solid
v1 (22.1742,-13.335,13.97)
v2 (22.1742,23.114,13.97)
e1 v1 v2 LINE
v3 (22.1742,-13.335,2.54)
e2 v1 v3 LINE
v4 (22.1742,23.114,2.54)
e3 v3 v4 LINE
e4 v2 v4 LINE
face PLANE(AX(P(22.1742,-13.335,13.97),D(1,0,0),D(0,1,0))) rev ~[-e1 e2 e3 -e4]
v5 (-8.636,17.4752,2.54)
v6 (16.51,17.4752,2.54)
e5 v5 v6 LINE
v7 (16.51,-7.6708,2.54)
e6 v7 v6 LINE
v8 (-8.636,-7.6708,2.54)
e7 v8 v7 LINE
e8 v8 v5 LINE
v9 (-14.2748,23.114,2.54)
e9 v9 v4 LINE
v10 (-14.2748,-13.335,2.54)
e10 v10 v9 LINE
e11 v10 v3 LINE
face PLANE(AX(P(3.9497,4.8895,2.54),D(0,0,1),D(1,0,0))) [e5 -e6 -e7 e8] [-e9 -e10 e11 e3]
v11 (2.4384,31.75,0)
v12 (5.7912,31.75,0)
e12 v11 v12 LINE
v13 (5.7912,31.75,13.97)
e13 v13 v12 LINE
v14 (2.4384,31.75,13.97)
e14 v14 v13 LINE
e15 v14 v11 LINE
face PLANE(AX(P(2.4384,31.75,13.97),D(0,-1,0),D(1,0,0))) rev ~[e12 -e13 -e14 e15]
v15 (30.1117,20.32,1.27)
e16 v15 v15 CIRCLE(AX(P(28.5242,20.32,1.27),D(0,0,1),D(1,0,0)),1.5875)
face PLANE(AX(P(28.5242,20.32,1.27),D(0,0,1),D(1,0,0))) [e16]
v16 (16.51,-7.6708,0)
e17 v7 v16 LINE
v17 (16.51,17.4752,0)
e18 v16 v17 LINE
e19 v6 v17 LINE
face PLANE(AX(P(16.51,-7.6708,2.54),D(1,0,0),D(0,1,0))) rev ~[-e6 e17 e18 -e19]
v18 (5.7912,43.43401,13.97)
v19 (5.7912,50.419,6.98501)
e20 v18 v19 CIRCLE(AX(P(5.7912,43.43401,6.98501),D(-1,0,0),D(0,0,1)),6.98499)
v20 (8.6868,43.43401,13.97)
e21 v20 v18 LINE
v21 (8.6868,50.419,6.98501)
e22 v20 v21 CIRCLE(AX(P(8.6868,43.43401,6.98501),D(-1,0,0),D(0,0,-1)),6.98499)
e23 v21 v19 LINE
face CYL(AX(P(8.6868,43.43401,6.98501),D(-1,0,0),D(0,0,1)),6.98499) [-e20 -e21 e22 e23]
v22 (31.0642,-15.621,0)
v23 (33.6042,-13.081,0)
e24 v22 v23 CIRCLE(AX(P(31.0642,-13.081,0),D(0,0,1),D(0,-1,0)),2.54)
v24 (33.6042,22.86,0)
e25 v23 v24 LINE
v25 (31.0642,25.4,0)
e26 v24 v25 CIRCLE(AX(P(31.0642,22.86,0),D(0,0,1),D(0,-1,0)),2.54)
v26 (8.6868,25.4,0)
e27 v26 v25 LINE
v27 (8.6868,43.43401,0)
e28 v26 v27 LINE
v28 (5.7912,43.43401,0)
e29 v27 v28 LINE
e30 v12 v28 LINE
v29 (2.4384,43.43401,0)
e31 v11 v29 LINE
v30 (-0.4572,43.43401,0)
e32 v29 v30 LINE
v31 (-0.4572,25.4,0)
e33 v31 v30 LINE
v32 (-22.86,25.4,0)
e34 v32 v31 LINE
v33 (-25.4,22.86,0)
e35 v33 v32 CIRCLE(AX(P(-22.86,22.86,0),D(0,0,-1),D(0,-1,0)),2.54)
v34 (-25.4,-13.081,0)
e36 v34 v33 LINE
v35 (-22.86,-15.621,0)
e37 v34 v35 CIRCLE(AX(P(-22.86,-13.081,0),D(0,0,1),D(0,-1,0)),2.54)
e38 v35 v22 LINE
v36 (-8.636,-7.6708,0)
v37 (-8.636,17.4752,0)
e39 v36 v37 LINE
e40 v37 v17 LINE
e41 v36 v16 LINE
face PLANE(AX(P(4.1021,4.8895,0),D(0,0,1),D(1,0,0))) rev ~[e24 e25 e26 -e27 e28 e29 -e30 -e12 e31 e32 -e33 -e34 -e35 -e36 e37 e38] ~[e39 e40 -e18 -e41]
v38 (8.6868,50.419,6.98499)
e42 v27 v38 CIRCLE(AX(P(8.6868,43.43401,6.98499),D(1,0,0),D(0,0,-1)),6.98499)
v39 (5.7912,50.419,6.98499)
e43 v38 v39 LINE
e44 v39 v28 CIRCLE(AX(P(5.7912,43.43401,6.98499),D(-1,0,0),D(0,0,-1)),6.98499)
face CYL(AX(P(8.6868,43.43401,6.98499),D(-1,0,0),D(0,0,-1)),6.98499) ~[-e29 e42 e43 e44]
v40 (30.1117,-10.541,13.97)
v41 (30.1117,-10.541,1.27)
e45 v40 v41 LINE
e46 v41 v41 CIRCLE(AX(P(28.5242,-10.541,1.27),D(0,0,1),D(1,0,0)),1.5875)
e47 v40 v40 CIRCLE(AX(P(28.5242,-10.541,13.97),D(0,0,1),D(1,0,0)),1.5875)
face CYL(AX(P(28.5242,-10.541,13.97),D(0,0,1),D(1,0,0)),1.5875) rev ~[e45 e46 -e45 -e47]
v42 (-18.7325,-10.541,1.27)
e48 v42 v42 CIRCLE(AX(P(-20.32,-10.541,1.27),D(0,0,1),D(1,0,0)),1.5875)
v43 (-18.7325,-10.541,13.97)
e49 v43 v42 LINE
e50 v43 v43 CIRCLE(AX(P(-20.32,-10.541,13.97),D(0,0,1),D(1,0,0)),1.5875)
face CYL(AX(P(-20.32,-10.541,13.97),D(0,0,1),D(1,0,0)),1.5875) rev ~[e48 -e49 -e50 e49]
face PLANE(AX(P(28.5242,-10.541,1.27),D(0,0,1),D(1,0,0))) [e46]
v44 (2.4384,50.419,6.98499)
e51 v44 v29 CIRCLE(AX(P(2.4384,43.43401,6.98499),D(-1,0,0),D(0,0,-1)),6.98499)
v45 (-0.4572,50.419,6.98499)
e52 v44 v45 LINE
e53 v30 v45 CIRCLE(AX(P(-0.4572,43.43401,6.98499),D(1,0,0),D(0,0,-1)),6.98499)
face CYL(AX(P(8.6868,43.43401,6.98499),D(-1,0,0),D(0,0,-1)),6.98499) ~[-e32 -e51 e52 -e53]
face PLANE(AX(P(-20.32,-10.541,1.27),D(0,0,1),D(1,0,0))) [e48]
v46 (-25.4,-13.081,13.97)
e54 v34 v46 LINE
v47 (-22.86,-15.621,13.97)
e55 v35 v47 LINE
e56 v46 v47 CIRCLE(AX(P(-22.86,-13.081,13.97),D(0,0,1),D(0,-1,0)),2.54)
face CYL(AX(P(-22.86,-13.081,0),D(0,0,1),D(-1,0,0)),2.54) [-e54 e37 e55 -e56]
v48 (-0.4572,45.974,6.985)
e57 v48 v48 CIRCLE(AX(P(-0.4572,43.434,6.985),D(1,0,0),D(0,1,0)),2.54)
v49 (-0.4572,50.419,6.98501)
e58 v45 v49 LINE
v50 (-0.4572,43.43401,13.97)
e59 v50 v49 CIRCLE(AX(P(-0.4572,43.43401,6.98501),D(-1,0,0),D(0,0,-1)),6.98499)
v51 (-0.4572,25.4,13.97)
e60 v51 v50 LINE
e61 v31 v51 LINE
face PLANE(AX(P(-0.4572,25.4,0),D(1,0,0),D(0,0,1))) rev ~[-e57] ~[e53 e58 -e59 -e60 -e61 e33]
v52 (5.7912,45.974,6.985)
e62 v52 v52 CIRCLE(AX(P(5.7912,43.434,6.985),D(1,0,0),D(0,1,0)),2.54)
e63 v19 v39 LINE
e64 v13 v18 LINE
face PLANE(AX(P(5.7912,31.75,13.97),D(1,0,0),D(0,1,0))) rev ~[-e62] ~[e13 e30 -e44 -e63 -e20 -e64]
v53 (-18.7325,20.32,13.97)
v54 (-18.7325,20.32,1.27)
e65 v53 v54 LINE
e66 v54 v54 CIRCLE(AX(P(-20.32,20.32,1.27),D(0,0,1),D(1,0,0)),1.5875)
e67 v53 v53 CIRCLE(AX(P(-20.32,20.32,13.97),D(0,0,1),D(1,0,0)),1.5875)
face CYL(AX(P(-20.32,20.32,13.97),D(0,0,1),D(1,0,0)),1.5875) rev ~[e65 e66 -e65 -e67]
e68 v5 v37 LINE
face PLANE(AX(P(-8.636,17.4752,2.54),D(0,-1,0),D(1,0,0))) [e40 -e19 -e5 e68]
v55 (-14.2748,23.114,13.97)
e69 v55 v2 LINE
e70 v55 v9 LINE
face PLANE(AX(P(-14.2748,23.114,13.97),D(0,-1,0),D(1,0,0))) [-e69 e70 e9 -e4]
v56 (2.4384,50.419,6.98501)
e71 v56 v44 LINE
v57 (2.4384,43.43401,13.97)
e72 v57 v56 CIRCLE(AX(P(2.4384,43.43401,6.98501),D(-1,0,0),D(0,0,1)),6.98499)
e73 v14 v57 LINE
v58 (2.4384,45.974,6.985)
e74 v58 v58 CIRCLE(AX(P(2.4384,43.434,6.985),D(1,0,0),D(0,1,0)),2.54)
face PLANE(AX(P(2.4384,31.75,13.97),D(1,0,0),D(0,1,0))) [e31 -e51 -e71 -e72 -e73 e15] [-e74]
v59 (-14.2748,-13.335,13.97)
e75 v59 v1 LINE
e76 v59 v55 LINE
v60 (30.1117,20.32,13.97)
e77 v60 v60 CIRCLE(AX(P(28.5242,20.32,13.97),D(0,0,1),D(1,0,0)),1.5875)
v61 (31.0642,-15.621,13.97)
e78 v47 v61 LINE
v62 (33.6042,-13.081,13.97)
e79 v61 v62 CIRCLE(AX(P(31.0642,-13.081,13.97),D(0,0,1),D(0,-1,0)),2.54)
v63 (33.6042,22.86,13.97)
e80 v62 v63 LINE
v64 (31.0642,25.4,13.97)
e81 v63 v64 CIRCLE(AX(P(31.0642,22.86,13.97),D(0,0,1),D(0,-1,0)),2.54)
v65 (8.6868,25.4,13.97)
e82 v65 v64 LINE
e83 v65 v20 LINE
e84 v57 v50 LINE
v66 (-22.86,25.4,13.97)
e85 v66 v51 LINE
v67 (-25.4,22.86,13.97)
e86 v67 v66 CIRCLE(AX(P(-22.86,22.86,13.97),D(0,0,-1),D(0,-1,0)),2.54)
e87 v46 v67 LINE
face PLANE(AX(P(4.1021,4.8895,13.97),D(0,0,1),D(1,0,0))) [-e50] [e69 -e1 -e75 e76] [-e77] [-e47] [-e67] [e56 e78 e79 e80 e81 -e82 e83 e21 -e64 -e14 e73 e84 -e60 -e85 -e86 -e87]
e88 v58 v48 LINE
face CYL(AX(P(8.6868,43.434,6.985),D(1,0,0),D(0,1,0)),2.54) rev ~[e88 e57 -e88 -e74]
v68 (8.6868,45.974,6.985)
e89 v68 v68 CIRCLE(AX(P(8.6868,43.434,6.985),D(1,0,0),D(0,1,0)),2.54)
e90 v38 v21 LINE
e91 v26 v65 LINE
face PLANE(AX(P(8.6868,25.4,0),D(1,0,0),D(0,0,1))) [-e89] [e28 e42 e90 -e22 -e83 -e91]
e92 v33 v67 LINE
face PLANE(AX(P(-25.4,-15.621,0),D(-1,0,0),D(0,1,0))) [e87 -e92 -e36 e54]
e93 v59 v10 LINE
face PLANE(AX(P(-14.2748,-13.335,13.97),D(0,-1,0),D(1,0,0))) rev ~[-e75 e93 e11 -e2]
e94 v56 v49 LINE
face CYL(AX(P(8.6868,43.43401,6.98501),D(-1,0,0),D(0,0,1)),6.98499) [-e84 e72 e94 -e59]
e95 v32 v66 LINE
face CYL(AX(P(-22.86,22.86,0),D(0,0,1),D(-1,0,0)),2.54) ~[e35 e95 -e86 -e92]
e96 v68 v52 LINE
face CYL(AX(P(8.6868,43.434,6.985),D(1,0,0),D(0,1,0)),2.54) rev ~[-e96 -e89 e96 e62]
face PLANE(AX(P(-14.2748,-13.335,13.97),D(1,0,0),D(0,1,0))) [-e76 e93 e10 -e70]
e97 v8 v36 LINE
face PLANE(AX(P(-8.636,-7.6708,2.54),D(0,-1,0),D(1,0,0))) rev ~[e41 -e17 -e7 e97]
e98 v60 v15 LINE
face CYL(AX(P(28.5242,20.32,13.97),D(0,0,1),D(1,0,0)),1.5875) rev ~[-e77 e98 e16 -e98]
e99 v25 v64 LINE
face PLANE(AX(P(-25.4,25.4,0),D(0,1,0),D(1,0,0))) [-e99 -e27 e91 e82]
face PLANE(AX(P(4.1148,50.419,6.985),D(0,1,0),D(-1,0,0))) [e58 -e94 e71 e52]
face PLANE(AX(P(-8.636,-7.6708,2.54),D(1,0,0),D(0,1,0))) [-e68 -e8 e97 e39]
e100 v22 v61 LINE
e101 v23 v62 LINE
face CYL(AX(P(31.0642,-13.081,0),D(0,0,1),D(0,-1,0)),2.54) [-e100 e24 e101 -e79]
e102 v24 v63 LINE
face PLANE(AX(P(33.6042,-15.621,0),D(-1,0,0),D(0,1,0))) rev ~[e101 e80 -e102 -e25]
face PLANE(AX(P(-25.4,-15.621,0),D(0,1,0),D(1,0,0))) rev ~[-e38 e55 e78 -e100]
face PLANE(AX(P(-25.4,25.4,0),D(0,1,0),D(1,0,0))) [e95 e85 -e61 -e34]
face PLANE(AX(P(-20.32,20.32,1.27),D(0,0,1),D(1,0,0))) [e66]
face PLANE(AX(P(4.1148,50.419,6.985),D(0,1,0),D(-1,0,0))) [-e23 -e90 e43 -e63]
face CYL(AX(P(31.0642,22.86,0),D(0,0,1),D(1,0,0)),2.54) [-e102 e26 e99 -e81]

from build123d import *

# Parameters (mm, degrees)
F0_W      = 59.0042
F0_H      = 41.021
F1_DEPTH  = 13.97
F2_R      = 2.54
F3_W      = 36.449
F3_H      = 36.449
F4_DEPTH  = 11.43
F5_W      = 25.146
F5_H      = 25.146
F6_DEPTH  = 2.541
F7_R      = 1.5875
F8_DEPTH  = 12.7
F9_W      = 9.144
F9_H      = 13.97
F10_DEPTH = 25.019
F11_R     = 6.98499
F12_W     = 3.3528
F12_H     = 22.225
F13_DEPTH = 13.971
F14_R     = 2.54
F15_DEPTH = 34.0878


# Not quite as in the source:
# - a fillet or chamfer is up to 0.001 mm smaller than in the source, because OpenCascade refuses the exact size


with BuildPart() as f1:
    # F0 (on Top) → F1 (new body)
    with BuildSketch(Plane.XY):
        with Locations((4.1021, 4.8895)):
            Rectangle(F0_W, F0_H)
    extrude(amount=F1_DEPTH)

    # F2
    f2_edges = [f1.edges().sort_by_distance(p)[0] for p in [
        (-25.4, 25.4, 6.985),
        (33.6042, 25.4, 6.985),
        (33.6042, -15.621, 6.985),
        (-25.4, -15.621, 6.985),
    ]]
    fillet(f2_edges, radius=F2_R)

    # F3 (on face) → F4 (cut)
    with BuildSketch(Plane.XY.offset(13.97)):
        with Locations((3.9497, 4.8895)):
            Rectangle(F3_W, F3_H)
    extrude(amount=-F4_DEPTH, mode=Mode.SUBTRACT)

    # F5 (on face) → F6 (cut, through all)
    with BuildSketch(Plane.XY.offset(2.54)):
        with Locations((3.937, 4.9022)):
            Rectangle(F5_W, F5_H)
    extrude(amount=-F6_DEPTH, mode=Mode.SUBTRACT)

    # F7 (on face) → F8 (cut)
    with BuildSketch(Plane.XY.offset(13.97)):
        with Locations((-20.32, 20.32)):
            Circle(F7_R)
        with Locations((-20.32, -10.541)):
            Circle(F7_R)
        with Locations((28.5242, 20.32)):
            Circle(F7_R)
        with Locations((28.5242, -10.541)):
            Circle(F7_R)
    extrude(amount=-F8_DEPTH, mode=Mode.SUBTRACT)

    # F9 (on face) → F10 (join)
    with BuildSketch(Plane(origin=(0, 25.4, 0), x_dir=(-1, 0, 0), z_dir=(0, 1, 0))):
        with Locations((-4.1148, 6.985)):
            Rectangle(F9_W, F9_H)
    extrude(amount=F10_DEPTH)

    # F11 (radius 6.985 in the source; OpenCascade refuses exactly that, so slightly less here)
    f11_edges = [f1.edges().sort_by_distance(p)[0] for p in [
        (4.1148, 50.419, 13.97),
        (4.1148, 50.419, 0),
    ]]
    fillet(f11_edges, radius=F11_R)

    # F12 (on face) → F13 (cut, through all)
    with BuildSketch(Plane.XY.offset(13.97)):
        with Locations((4.1148, 42.8625)):
            Rectangle(F12_W, F12_H)
    extrude(amount=-F13_DEPTH, mode=Mode.SUBTRACT)

    # F14 (on face) → F15 (cut, through all)
    with BuildSketch(Plane.YZ.offset(8.6868)):
        with Locations((43.434, 6.985)):
            Circle(F14_R)
    extrude(amount=-F15_DEPTH, mode=Mode.SUBTRACT)


solid = f1.part
